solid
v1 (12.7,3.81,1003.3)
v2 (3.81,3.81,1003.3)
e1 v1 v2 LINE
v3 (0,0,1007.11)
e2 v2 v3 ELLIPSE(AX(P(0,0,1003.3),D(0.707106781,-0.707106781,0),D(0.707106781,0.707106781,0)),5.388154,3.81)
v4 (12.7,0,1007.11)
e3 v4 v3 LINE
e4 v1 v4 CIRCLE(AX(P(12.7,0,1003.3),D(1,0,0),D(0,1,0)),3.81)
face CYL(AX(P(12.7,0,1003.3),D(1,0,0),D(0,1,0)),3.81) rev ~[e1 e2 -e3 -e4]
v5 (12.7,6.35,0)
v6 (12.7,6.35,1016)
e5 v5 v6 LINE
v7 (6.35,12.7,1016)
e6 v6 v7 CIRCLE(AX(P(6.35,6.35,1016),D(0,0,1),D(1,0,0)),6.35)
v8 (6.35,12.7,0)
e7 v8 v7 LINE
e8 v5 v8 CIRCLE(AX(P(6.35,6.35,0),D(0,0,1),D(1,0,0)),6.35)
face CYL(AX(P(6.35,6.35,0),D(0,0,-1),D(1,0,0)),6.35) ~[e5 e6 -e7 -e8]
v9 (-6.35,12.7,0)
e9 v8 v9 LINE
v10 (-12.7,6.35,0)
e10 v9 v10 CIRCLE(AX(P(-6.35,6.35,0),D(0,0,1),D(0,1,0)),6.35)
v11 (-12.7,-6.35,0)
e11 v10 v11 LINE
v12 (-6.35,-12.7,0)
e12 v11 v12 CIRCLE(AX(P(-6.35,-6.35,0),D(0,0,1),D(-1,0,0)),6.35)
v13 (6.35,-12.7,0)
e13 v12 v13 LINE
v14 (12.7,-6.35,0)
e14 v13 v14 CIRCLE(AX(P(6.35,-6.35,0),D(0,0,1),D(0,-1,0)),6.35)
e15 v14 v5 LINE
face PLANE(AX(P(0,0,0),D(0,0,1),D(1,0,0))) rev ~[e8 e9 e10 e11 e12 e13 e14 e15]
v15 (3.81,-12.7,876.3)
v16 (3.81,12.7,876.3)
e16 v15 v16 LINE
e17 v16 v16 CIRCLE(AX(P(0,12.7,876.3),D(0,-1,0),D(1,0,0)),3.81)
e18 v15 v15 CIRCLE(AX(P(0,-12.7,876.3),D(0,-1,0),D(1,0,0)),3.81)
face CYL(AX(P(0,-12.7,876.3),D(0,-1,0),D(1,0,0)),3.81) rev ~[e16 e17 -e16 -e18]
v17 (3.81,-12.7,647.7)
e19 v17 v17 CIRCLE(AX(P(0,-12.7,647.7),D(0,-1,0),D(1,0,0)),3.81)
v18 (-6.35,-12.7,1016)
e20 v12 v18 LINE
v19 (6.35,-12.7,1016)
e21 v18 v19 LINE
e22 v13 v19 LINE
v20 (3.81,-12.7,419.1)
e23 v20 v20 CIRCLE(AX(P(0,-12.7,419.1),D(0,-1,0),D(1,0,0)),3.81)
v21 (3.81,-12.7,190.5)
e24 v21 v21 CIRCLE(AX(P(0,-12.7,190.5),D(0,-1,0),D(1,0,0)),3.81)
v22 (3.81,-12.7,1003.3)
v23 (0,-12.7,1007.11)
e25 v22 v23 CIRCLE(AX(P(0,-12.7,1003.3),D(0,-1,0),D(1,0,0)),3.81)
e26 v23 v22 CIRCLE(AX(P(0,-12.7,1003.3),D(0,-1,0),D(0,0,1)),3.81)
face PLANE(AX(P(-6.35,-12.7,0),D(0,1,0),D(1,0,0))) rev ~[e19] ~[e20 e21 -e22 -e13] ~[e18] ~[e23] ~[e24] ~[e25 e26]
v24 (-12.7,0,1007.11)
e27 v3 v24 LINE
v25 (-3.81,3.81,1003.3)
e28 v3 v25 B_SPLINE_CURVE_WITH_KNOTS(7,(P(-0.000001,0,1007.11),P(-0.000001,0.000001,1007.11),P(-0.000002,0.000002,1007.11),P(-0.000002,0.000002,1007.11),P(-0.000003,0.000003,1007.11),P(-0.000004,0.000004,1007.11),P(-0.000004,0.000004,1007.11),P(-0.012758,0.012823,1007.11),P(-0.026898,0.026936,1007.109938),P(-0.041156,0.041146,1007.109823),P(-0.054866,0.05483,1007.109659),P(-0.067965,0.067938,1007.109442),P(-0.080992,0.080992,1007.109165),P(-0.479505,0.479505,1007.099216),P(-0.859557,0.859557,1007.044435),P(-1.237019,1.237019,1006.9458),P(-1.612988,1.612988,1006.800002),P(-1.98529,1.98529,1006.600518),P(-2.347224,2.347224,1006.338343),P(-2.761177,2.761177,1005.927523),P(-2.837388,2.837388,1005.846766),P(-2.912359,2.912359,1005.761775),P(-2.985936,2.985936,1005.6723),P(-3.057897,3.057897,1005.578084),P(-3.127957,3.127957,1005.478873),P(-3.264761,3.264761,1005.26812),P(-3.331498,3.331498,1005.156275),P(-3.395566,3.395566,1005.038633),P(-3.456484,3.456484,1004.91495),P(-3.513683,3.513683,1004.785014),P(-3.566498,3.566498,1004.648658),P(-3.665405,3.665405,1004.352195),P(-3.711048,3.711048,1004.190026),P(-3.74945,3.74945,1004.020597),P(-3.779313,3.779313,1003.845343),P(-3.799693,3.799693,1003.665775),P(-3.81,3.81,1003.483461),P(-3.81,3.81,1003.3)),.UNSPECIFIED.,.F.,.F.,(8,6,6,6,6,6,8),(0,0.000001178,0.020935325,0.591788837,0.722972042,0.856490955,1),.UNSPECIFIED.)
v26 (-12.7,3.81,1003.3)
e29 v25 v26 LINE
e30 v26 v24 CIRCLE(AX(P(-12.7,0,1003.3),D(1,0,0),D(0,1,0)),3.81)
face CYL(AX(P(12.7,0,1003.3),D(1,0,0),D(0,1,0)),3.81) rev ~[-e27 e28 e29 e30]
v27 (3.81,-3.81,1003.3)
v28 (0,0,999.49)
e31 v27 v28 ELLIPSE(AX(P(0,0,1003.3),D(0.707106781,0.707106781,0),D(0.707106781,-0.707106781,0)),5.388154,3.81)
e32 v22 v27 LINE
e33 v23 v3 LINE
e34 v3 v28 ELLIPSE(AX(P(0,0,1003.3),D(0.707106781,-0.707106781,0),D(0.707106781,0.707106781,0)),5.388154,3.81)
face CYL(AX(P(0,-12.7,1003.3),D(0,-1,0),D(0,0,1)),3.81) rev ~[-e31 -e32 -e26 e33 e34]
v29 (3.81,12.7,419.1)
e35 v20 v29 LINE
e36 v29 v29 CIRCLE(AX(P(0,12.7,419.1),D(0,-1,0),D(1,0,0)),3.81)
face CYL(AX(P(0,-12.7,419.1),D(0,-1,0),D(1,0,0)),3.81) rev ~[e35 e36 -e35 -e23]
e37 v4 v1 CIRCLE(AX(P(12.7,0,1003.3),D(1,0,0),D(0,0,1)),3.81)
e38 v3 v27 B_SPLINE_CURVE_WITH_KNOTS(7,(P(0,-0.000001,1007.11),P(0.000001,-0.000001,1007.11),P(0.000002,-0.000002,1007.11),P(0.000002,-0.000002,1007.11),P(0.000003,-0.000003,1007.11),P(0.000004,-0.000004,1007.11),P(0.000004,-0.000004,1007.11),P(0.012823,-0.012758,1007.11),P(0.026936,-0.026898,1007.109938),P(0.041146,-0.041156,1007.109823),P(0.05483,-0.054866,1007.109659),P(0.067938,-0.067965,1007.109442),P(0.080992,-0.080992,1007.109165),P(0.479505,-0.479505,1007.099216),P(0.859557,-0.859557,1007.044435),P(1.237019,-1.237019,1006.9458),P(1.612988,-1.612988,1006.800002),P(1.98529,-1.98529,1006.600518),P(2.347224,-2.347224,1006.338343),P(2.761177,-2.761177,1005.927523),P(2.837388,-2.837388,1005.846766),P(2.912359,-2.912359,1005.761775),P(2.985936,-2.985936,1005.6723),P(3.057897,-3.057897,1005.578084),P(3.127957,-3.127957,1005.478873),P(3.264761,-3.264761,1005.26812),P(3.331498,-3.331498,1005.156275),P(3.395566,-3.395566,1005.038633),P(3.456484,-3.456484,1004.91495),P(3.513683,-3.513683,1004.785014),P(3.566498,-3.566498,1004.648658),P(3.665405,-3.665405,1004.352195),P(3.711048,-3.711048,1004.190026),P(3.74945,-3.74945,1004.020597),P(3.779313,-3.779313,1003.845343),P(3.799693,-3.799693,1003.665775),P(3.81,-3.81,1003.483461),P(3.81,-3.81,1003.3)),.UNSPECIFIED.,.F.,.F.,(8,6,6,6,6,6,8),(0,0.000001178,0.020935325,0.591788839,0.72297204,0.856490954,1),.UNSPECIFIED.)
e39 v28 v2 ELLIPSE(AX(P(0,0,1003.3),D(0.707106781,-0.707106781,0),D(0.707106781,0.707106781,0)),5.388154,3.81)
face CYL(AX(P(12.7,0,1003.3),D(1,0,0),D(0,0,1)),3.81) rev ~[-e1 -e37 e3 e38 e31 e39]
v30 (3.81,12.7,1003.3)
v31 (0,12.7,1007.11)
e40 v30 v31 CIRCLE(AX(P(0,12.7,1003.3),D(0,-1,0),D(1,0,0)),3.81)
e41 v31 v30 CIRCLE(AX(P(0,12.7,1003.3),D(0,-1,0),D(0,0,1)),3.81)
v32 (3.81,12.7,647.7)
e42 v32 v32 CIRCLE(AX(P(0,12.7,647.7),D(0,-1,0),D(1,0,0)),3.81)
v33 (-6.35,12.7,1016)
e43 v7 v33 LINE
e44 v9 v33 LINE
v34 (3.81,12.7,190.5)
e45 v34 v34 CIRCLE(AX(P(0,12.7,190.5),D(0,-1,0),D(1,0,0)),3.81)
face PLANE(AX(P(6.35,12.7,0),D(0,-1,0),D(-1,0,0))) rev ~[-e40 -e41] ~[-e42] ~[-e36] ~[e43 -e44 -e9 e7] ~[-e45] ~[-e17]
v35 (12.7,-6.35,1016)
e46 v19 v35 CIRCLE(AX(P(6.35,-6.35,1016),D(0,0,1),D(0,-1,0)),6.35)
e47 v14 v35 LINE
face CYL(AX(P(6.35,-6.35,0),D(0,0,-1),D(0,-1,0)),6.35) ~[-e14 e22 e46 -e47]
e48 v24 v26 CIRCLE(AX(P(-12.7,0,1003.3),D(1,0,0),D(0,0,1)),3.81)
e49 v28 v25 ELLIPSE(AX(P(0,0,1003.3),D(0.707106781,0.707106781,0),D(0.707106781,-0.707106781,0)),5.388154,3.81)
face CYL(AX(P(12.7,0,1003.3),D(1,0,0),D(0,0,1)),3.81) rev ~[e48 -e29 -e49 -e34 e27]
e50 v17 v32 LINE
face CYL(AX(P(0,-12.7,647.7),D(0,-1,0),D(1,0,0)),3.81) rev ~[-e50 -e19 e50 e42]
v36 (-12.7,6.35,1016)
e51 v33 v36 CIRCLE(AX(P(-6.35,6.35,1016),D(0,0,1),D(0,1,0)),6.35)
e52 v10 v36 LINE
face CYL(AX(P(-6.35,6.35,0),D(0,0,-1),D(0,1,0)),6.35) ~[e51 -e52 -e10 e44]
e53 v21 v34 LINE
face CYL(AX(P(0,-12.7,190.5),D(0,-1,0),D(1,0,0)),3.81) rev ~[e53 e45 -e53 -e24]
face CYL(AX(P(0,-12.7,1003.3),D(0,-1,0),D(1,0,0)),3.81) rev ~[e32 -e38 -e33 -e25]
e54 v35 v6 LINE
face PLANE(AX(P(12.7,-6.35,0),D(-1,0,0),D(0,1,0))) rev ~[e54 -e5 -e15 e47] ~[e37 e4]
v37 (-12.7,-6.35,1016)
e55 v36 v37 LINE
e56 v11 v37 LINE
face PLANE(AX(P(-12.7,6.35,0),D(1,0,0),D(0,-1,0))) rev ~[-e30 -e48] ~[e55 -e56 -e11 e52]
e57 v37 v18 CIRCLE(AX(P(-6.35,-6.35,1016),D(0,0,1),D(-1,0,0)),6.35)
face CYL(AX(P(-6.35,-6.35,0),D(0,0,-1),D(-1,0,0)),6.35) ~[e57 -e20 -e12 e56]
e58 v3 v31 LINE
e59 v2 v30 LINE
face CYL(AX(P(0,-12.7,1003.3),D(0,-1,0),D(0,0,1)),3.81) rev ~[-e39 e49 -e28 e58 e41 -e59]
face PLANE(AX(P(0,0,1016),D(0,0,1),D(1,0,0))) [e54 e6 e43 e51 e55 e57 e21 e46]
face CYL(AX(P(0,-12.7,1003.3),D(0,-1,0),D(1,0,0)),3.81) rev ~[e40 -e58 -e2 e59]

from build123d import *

# Parameters (mm, degrees)
F1_DEPTH = 1016
F4_DEPTH = 25.4
F2_R     = 3.81
F5_DEPTH = 25.4
F6_DEPTH = 25.4


# Not quite as in the source:
# - a feature names something its author has since deleted; it is built from what else it names


with BuildPart() as f1:
    # F0 (on Top) → F1 (new body)
    with BuildSketch(Plane.XY):
        with BuildLine():
            ThreePointArc((12.7, 6.35), (10.8401280605, 10.8401280605), (6.35, 12.7))
            Line((6.35, 12.7), (-6.35, 12.7))
            ThreePointArc((-6.35, 12.7), (-10.8401280605, 10.8401280605), (-12.7, 6.35))
            Line((-12.7, 6.35), (-12.7, -6.35))
            ThreePointArc((-12.7, -6.35), (-10.8401280605, -10.8401280605), (-6.35, -12.7))
            Line((-6.35, -12.7), (6.35, -12.7))
            ThreePointArc((6.35, -12.7), (10.8401280605, -10.8401280605), (12.7, -6.35))
            Line((12.7, -6.35), (12.7, 6.35))
        make_face()
    extrude(amount=F1_DEPTH)

    # F3 (on face) → F4 (cut)
    with BuildSketch(Plane.YZ.offset(12.7)):
        with BuildLine():
            ThreePointArc((3.81, 1003.3), (2.6940768363, 1005.9940768363), (0, 1007.11))
            ThreePointArc((0, 1007.11), (-2.6940768363, 1000.6059231637), (3.81, 1003.3))
        make_face()
    extrude(amount=-F4_DEPTH, mode=Mode.SUBTRACT)

    # F2 (on face) → F5 (cut)
    with BuildSketch(Plane.XZ.offset(12.7)):
        with BuildLine():
            ThreePointArc((3.81, 1003.3), (2.6940768363, 1005.9940768363), (0, 1007.11))
            ThreePointArc((0, 1007.11), (-2.6940768363, 1000.6059231637), (3.81, 1003.3))
        make_face()
        with Locations((0, 876.3)):
            Circle(F2_R)
        with Locations((0, 647.7)):
            Circle(F2_R)
        with Locations((0, 419.1)):
            Circle(F2_R)
    extrude(amount=-F5_DEPTH, mode=Mode.SUBTRACT)

    # F2 (on face) → F6 (cut)
    with BuildSketch(Plane.XZ.offset(12.7)):
        with Locations((0, 190.5)):
            Circle(F2_R)
    extrude(amount=-F6_DEPTH, mode=Mode.SUBTRACT)


solid = f1.part
